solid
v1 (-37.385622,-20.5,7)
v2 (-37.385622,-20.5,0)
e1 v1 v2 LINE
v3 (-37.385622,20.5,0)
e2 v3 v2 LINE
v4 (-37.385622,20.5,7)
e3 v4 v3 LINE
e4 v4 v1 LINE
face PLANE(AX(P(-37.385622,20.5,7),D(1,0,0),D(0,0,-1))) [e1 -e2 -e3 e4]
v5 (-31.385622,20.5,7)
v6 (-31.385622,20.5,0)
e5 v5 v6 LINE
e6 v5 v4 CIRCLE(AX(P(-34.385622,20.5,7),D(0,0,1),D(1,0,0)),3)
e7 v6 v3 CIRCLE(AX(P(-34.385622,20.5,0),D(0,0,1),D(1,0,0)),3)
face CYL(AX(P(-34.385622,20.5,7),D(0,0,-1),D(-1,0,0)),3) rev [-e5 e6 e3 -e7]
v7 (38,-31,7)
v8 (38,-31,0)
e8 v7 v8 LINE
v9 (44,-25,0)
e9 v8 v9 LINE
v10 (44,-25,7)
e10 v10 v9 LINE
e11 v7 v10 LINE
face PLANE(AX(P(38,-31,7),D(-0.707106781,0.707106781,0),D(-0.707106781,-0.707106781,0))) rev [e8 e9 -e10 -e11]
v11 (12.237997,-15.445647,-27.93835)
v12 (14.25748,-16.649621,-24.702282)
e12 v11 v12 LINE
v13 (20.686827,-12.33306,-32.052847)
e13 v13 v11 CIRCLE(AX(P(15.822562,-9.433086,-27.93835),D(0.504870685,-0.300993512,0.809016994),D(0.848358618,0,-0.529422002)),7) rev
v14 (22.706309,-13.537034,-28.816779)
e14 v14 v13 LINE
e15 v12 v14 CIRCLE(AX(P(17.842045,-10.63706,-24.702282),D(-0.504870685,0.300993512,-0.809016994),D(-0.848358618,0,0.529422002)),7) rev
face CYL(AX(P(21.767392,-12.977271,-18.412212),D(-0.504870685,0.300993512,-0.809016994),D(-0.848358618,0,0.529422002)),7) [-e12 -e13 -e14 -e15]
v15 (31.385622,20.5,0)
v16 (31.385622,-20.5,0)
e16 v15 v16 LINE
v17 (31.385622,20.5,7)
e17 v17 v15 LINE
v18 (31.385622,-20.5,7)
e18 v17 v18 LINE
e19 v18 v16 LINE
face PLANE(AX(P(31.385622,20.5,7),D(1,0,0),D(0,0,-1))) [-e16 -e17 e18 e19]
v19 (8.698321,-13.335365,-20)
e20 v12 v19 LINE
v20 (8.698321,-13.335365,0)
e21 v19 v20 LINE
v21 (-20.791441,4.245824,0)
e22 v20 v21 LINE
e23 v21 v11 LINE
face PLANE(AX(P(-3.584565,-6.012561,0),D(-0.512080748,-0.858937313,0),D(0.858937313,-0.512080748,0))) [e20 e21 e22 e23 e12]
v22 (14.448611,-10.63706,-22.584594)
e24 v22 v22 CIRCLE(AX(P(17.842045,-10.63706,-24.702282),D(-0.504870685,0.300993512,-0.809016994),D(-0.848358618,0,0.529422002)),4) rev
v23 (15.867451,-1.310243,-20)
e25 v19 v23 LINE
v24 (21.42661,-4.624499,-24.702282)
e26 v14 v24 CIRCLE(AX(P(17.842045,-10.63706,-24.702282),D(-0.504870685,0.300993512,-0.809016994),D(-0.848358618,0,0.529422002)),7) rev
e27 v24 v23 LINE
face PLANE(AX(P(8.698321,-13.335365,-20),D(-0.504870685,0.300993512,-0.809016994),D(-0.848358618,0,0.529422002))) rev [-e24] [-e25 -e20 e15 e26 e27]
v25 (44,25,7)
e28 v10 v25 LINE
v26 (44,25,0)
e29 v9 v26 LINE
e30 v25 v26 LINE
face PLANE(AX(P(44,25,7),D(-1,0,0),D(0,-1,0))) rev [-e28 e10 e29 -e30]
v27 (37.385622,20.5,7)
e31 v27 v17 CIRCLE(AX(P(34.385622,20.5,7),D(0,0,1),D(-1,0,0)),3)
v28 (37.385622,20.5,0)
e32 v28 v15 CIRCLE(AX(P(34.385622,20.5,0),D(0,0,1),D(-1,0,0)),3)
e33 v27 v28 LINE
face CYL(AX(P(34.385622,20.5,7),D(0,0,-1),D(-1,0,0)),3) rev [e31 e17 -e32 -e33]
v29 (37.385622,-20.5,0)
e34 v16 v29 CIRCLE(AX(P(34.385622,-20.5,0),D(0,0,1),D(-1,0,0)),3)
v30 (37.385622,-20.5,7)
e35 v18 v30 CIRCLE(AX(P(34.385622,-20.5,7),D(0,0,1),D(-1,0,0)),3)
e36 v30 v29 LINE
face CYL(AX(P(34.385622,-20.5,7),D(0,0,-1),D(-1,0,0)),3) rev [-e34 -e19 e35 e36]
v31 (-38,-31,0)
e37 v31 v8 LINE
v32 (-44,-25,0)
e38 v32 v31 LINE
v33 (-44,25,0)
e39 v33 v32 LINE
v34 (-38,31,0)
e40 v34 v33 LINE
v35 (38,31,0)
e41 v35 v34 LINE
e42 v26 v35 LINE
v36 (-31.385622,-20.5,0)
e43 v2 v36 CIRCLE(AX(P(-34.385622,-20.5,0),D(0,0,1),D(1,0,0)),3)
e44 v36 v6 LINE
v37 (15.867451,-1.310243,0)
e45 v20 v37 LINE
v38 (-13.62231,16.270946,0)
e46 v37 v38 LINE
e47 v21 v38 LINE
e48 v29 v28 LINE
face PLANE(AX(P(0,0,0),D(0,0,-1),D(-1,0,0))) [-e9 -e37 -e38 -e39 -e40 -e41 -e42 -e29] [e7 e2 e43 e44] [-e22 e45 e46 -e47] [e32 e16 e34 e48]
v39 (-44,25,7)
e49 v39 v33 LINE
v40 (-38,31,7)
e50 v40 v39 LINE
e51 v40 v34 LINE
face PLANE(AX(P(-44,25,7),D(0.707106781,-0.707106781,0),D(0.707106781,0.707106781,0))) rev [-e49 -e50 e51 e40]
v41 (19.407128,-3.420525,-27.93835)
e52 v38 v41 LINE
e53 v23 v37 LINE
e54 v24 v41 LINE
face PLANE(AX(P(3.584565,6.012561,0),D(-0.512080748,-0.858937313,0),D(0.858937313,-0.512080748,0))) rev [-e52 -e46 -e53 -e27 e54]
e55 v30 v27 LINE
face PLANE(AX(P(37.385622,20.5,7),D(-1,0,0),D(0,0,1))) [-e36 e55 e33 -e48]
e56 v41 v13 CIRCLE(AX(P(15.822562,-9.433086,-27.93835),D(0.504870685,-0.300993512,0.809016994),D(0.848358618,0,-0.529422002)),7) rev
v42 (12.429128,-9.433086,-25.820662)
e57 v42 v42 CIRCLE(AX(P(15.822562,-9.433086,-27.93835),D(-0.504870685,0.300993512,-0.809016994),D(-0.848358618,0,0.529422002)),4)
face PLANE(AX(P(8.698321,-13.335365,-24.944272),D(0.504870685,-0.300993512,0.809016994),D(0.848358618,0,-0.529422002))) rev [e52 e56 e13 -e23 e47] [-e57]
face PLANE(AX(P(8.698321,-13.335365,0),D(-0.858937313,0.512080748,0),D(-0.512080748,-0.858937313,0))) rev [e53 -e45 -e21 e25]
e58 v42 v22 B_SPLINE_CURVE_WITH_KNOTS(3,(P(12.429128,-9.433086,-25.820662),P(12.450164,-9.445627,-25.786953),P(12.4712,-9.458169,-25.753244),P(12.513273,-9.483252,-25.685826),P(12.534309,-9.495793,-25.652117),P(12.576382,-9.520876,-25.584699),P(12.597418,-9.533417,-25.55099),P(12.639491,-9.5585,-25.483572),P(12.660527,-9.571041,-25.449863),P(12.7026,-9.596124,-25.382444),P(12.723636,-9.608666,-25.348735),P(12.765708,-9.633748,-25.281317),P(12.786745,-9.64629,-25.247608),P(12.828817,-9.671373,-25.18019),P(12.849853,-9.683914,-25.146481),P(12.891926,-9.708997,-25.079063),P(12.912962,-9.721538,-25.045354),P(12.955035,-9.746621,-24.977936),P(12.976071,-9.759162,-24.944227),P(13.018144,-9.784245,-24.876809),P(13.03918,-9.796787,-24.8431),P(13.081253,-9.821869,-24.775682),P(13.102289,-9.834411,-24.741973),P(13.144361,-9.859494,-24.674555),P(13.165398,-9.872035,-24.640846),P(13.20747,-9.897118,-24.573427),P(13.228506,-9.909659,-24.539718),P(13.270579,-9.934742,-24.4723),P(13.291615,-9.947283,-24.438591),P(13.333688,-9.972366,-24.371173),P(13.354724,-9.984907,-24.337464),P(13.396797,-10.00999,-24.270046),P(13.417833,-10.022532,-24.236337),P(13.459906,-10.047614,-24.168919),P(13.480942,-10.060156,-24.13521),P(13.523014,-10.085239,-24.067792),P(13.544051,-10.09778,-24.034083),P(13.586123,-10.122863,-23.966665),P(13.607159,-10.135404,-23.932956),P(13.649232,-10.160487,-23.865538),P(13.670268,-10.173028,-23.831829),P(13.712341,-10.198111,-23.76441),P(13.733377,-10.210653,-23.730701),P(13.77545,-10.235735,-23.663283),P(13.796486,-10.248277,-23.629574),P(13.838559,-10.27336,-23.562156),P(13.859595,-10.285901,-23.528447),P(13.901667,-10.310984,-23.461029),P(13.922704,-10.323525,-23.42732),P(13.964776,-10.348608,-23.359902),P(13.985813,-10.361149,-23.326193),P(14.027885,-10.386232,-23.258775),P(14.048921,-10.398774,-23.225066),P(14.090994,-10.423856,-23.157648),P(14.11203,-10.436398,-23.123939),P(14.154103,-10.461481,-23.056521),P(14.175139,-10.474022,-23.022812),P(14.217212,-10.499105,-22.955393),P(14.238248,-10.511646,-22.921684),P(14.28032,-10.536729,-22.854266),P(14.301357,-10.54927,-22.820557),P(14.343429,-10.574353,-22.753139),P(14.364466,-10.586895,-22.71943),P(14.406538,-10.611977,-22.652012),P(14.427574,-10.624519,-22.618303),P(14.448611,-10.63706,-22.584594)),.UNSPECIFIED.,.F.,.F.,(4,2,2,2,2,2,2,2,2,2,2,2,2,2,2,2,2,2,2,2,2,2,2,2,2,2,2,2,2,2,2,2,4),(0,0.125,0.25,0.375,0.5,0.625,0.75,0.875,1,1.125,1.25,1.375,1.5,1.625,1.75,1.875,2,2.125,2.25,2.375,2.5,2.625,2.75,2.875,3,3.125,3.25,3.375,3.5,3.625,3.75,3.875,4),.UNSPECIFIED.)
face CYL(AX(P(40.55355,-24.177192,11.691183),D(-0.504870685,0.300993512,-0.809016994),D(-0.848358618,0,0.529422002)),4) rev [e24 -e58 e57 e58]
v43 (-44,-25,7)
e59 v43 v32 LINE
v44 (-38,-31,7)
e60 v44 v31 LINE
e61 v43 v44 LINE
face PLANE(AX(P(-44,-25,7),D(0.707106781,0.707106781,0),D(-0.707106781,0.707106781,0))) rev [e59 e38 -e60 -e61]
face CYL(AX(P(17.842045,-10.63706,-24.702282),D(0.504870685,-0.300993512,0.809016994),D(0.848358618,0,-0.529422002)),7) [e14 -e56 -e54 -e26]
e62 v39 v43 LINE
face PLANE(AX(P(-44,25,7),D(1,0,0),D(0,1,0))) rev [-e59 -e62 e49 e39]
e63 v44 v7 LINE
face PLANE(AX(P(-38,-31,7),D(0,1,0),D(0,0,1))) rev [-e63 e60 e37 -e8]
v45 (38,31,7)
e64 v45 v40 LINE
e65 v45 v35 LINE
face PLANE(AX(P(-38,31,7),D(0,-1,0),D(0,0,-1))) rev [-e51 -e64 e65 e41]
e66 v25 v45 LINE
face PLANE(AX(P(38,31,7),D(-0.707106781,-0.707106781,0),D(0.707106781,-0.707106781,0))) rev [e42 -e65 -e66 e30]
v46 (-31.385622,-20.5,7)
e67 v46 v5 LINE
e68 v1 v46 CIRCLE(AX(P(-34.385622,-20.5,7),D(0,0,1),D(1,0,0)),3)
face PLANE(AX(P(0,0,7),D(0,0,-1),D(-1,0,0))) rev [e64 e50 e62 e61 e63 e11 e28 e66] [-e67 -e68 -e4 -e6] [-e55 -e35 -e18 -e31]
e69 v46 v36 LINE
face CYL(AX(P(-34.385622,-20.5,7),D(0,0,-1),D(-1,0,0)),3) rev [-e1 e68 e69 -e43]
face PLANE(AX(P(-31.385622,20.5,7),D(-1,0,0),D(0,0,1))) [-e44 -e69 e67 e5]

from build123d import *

# Parameters (mm, degrees)
BOSS_EXTRUDE1_DEPTH = 7
BOSS_EXTRUDE2_DEPTH = 7
FILLET1_R           = 7
CUT_EXTRUDE1_REACH  = 66.771
SKETCH6_R           = 4


with BuildPart() as part:
    # Sketch1 → Boss-Extrude1 (new body)
    with BuildSketch(Plane.XY):
        Polygon((-44, 25), (-38, 31), (38, 31), (44, 25), (44, -25), (38, -31), (-38, -31), (-44, -25), align=None)
        with BuildLine():
            Line((-31.385621722, 20.5), (-31.385621722, -20.5))
            ThreePointArc((-31.385621722, -20.5), (-34.385621722, -23.5), (-37.385621722, -20.5))
            Line((-37.385621722, -20.5), (-37.385621722, 20.5))
            ThreePointArc((-37.385621722, 20.5), (-34.385621722, 23.5), (-31.385621722, 20.5))
        make_face(mode=Mode.SUBTRACT)
        with BuildLine():
            Line((31.385621722, 20.5), (31.385621722, -20.5))
            ThreePointArc((31.385621722, -20.5), (34.385621722, -23.5), (37.385621722, -20.5))
            Line((37.385621722, -20.5), (37.385621722, 20.5))
            ThreePointArc((37.385621722, 20.5), (34.385621722, 23.5), (31.385621722, 20.5))
        make_face(mode=Mode.SUBTRACT)
    extrude(amount=BOSS_EXTRUDE1_DEPTH)

    # Sketch2 → Boss-Extrude2 (add, symmetric)
    with BuildSketch(Plane(origin=(0, 0, 0), x_dir=(-0.8589373126285005, 0.5120807484904403, 0), z_dir=(-0.5120807484904403, -0.8589373126285005, 0))):
        Polygon((20.032748859, 0), (-14.300096017, 0), (-14.300096017, 20), (-26.435350933, 28.816778784), (-24.084209923, 32.052846762), (-14.300096017, 24.94427191), align=None)
    extrude(amount=BOSS_EXTRUDE2_DEPTH, both=True)

    # Fillet1
    fillet1_edges = [part.edges().sort_by_distance(p)[0] for p in [
        (25.281133158, -6.92248608, -30.434812773),
        (18.112002679, -18.947608457, -30.434812773),
    ]]
    fillet(fillet1_edges, radius=FILLET1_R - 0.0001)  # a hair under: the kernel refuses the full size

    # Sketch6 → Cut-Extrude1 (cut, up to next)
    with BuildSketch(Plane(origin=(-5.944829265, 3.544184861, -9.526138171), x_dir=(-0.8631949903821312, -0.17604689815365596, 0.4731827323874666), z_dir=(-0.5048706850067575, 0.30099351194556917, -0.8090169943749512)), mode=Mode.PRIVATE) as cut_extrude1_sk1:
        with Locations(Location((-25.217235821, -18.583042284, 0), (0, 0, 10.638271161))):
            Circle(SKETCH6_R)
    cut_extrude1_tool1 = extrude(cut_extrude1_sk1.sketch, amount=-CUT_EXTRUDE1_REACH, mode=Mode.PRIVATE) & part.part
    add(cut_extrude1_tool1.solids().sort_by_distance((15.822562, -9.433086, -27.93835))[0], mode=Mode.SUBTRACT)


solid = part.part
